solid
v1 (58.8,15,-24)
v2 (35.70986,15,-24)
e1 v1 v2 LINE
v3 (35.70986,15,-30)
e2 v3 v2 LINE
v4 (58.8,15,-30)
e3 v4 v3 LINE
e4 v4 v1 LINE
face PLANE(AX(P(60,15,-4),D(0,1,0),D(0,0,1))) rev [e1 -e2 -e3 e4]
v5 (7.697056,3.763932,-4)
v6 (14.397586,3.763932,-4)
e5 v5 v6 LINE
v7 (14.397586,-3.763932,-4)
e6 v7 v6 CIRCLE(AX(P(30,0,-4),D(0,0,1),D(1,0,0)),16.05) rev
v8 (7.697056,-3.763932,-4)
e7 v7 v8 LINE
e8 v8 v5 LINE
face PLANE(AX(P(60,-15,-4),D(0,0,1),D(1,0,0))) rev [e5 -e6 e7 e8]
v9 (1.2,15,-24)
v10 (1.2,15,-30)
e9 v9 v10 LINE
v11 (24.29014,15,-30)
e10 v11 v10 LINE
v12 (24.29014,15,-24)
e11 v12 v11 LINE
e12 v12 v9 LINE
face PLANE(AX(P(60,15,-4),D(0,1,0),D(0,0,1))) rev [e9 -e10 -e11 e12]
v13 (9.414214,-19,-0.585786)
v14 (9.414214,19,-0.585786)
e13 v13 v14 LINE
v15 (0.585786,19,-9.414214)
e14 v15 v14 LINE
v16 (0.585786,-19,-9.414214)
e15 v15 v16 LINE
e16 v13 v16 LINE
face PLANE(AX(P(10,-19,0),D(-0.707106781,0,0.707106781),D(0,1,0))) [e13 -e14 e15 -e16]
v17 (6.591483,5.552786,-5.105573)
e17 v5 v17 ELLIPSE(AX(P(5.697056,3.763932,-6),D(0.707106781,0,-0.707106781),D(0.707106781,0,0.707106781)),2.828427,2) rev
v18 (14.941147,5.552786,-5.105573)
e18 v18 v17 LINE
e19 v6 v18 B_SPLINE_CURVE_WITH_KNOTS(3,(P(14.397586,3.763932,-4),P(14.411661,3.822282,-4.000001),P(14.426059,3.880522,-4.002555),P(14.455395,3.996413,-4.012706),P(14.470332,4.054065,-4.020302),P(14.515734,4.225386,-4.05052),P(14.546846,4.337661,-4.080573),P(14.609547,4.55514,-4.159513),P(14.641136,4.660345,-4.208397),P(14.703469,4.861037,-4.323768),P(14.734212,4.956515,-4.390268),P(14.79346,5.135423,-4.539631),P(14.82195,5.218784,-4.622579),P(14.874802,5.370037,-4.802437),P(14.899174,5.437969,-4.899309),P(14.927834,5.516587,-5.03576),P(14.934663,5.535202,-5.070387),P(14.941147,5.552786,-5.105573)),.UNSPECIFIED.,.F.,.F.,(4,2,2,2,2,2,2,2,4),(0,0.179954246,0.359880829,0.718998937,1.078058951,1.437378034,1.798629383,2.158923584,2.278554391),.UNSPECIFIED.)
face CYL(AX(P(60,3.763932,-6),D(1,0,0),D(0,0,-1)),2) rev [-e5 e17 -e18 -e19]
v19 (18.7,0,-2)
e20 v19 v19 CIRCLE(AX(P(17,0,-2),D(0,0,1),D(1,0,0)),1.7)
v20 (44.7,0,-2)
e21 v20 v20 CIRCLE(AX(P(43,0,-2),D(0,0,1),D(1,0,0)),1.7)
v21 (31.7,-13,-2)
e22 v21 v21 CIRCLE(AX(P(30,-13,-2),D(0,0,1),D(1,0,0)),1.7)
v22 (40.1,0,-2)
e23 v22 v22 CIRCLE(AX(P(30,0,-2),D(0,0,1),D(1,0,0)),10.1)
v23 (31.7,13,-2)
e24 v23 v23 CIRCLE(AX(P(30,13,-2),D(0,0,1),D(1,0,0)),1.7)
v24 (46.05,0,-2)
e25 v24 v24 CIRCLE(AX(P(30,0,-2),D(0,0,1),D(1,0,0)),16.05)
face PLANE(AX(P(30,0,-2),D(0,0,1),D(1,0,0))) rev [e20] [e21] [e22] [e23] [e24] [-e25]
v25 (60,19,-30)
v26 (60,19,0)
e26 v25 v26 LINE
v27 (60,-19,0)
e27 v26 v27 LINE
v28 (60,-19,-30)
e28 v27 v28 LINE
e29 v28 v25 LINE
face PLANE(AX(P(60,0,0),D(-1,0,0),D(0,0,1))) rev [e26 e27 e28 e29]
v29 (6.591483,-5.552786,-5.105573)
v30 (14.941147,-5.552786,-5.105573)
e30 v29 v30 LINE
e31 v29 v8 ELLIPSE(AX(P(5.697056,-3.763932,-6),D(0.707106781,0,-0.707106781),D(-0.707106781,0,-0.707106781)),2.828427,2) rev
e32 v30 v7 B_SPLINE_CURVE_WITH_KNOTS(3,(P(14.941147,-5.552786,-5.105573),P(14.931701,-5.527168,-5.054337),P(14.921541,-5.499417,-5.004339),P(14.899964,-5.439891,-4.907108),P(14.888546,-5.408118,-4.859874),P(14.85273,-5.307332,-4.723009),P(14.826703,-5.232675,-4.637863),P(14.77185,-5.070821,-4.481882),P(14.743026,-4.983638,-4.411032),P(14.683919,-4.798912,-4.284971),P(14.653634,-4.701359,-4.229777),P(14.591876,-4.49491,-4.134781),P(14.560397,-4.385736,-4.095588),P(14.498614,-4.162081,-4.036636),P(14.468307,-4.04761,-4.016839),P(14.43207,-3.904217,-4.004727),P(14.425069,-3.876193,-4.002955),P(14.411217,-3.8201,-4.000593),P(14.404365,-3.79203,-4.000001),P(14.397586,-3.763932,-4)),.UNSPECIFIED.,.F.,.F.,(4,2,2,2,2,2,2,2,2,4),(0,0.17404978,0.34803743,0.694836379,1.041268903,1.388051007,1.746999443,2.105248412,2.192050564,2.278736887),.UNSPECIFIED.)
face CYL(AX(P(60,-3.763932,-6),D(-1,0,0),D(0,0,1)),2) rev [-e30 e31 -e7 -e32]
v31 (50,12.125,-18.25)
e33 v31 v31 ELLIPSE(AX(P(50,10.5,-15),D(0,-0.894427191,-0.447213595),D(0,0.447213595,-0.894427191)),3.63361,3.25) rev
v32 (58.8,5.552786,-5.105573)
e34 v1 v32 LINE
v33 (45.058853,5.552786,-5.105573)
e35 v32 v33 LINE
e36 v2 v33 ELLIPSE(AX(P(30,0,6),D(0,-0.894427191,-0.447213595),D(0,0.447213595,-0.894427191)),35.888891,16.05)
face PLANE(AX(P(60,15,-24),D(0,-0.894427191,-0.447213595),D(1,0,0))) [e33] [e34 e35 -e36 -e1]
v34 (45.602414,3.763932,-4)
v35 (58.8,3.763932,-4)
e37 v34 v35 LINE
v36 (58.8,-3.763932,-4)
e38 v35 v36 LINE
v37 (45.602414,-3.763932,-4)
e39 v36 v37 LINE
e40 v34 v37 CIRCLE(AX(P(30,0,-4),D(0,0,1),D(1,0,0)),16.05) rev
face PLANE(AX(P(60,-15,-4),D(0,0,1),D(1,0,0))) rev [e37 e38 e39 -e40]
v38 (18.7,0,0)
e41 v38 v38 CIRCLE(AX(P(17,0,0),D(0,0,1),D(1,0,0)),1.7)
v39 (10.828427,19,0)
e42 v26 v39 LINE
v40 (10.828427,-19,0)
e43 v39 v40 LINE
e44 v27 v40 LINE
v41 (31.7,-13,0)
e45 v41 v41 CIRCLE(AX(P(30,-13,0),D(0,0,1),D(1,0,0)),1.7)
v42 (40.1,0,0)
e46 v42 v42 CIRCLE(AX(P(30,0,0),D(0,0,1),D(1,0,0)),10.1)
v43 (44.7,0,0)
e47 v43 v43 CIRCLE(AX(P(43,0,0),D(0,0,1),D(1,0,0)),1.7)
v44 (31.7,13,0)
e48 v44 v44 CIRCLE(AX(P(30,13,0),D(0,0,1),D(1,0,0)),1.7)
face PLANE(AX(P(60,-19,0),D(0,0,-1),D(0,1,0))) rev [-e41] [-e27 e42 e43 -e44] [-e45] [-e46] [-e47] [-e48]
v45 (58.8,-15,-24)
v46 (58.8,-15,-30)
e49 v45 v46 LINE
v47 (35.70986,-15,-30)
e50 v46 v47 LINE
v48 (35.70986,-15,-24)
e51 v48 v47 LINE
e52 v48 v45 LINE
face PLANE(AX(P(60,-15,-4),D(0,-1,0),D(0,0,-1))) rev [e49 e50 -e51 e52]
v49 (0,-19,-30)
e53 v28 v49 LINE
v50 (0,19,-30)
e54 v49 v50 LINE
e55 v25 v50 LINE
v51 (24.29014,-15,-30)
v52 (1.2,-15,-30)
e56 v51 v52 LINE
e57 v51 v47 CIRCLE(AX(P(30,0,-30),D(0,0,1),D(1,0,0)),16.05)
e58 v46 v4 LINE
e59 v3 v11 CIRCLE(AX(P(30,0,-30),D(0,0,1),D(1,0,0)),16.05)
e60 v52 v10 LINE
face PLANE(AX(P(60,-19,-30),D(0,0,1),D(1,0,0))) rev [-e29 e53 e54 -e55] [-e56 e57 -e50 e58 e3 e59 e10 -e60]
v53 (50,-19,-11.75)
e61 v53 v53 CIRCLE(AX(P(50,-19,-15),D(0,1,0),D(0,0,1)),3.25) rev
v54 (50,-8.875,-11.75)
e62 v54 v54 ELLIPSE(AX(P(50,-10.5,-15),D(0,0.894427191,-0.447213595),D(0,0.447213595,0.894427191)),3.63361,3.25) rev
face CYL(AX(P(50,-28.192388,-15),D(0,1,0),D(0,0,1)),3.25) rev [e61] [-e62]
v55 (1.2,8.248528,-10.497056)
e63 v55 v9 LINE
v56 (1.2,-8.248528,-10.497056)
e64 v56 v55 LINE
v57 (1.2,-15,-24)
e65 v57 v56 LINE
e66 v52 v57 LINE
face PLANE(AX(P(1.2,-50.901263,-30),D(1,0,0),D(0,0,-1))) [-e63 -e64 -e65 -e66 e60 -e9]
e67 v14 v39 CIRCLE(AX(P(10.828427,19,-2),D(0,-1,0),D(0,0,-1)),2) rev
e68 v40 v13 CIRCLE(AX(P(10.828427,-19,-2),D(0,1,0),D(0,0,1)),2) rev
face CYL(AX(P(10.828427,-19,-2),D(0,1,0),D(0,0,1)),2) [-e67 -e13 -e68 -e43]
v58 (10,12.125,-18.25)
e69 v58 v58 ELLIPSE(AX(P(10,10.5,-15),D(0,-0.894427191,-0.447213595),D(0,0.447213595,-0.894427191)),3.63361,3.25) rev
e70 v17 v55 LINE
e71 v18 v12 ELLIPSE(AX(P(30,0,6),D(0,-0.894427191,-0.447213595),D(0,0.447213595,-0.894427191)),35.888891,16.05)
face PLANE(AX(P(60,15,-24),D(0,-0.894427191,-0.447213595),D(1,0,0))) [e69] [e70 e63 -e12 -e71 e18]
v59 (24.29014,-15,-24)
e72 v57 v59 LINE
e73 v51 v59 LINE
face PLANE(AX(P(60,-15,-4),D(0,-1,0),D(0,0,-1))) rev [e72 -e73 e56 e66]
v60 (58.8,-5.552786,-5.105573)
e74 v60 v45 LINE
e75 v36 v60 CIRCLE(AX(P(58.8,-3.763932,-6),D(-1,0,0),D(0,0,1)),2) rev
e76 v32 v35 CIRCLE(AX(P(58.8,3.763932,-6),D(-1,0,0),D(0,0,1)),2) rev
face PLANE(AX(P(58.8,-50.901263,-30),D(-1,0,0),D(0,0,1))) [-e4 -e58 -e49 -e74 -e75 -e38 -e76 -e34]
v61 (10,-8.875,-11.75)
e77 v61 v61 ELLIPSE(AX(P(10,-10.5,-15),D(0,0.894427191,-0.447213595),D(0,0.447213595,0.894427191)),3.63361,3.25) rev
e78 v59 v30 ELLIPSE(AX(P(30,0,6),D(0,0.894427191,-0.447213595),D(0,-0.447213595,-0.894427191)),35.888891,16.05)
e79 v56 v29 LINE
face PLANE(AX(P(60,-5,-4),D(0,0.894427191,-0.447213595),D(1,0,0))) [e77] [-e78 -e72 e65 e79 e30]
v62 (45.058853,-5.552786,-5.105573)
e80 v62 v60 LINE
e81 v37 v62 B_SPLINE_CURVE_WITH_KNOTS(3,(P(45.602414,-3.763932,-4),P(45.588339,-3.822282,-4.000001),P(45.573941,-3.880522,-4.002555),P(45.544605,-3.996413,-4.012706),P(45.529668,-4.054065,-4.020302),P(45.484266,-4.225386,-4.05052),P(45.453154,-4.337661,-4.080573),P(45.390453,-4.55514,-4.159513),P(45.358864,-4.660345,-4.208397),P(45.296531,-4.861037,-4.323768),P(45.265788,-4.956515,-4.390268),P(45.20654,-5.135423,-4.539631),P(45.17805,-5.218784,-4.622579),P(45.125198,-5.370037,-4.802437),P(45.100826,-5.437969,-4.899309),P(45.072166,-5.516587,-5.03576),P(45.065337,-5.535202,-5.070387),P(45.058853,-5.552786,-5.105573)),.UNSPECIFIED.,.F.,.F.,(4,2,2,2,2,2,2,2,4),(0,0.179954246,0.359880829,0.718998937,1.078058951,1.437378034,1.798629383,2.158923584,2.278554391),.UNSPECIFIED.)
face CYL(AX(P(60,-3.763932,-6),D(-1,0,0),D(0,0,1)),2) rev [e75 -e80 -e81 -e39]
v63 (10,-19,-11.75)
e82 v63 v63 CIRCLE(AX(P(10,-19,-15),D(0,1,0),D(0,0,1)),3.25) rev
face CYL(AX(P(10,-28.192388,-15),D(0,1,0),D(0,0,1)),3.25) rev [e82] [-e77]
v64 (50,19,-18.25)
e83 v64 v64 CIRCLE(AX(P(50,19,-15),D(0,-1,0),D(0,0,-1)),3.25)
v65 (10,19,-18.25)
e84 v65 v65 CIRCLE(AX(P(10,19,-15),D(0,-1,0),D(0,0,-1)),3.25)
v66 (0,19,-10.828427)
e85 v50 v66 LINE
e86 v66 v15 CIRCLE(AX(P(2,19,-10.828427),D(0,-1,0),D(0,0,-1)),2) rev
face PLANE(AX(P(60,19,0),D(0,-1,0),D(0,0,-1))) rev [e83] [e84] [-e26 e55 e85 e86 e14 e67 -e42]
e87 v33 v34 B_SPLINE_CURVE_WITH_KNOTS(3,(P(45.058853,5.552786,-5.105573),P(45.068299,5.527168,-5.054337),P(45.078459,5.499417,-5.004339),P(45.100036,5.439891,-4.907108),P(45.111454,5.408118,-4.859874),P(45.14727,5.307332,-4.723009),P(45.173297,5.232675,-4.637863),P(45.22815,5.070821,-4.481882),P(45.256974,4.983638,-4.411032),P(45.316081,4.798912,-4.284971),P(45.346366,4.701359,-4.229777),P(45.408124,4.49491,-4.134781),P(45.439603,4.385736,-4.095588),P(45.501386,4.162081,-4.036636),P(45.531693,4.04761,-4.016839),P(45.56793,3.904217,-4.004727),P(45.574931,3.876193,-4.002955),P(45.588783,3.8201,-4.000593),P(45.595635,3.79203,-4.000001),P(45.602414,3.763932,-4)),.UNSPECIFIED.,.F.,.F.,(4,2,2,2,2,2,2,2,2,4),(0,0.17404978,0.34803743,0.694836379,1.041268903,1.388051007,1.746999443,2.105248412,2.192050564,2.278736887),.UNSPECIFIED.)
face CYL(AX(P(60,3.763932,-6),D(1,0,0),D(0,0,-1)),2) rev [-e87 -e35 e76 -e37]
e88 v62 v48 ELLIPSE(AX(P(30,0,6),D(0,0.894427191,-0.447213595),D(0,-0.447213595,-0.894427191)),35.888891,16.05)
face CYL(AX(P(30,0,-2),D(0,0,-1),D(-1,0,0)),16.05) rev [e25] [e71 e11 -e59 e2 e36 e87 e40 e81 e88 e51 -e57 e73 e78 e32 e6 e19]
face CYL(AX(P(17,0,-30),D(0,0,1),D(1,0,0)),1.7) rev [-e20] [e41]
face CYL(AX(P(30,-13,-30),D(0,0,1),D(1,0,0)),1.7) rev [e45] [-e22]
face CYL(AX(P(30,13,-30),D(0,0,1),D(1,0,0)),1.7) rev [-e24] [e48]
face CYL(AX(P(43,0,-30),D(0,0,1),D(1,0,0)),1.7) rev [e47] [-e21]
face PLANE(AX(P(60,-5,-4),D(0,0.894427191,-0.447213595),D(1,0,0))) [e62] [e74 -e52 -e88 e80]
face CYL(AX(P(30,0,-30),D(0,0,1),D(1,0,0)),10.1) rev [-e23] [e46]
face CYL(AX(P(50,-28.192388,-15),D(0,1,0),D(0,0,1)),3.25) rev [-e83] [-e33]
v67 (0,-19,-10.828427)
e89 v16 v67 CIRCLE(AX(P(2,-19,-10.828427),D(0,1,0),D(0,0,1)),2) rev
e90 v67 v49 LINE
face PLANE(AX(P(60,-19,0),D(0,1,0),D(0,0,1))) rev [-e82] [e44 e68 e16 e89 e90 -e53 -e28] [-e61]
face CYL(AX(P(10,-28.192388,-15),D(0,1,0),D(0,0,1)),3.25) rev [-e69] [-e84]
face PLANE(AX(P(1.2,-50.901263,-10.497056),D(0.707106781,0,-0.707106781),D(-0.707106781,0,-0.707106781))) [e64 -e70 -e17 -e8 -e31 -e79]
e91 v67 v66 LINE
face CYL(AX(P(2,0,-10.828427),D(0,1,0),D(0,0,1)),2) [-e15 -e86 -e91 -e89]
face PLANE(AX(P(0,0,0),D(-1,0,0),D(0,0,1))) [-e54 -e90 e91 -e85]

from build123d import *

# Parameters (mm, degrees)
BOSS_EXTRU_1_DEPTH                  = 60
CHANFREIN2_SIZE                     = 10
CHANFREIN2_SIZE2                    = 20
CHANFREIN3_SIZE                     = 20
CHANFREIN3_SIZE2                    = 10
CONG_3_R                            = 2
ENL_V_MAT_EXTRU_4_DEPTH             = 2
ENL_V_MAT_EXTRU_4_DEPTH_BACK        = 66.720872054
ENL_V_MAT_EXTRU_4_START             = -4
ESQUISSE5_R                         = 16.05
ESQUISSE2_R                         = 1.7
ESQUISSE2_R_2                       = 10.1
ENL_V_MAT_EXTRU_1_DEPTH             = 70.720872183
ESQUISSE3_R                         = 1.6
ENL_V_MAT_EXTRU_2_DEPTH             = 78.097341186
ENL_V_MAT_EXTRU_5_REACH             = 71.721
ESQUISSE6_R                         = 3.25
ENL_V_MAT_EXTRU_5_DIRECTION_2_REACH = 71.721
CHANFREIN1_SIZE                     = 10
BOSS_EXTRU_3_REACH                  = 79.097
ESQUISSE8_W                         = 1.2
ESQUISSE8_H                         = 30
CONG_2_R                            = 2


with BuildPart() as part:
    # Esquisse1 → Boss.-Extru.1 (new body)
    with BuildSketch(Plane(origin=(0, 0, 0), x_dir=(0, 0, -1), z_dir=(1, 0, 0))):
        Polygon((0, -19), (0, 19), (30, 19), (30, 15), (4, 15), (4, -15), (30, -15), (30, -19), align=None)
    extrude(amount=BOSS_EXTRU_1_DEPTH)

    # Chanfrein2
    chanfrein2_edges = [part.edges().sort_by_distance(p)[0] for p in [
        (30, 15, -4),
    ]]
    chanfrein2_side = [part.faces().sort_by_distance(p)[0] for p in [
        (30, 0, -4),
    ]]
    chamfer(chanfrein2_edges, length=CHANFREIN2_SIZE, length2=CHANFREIN2_SIZE2, reference=chanfrein2_side[0])

    # Chanfrein3
    chanfrein3_edges = [part.edges().sort_by_distance(p)[0] for p in [
        (30, -15, -4),
    ]]
    chanfrein3_side = [part.faces().sort_by_distance(p)[0] for p in [
        (30, -15, -17),
    ]]
    chamfer(chanfrein3_edges, length=CHANFREIN3_SIZE, length2=CHANFREIN3_SIZE2, reference=chanfrein3_side[0])

    # Congé3
    cong_3_edges = [part.edges().sort_by_distance(p)[0] for p in [
        (30, 5, -4),
        (30, -5, -4),
    ]]
    fillet(cong_3_edges, radius=CONG_3_R)

    # Esquisse5 → Enlèv. mat.-Extru.4 (cut, two sides: drawn at the far end of the back side and taken through both)
    with BuildSketch(Plane.XY.offset(ENL_V_MAT_EXTRU_4_START - ENL_V_MAT_EXTRU_4_DEPTH_BACK)):
        with Locations(Location((30, 0, 0), (0, 0, 193.562911562))):
            Circle(ESQUISSE5_R)
    extrude(amount=ENL_V_MAT_EXTRU_4_DEPTH + ENL_V_MAT_EXTRU_4_DEPTH_BACK, mode=Mode.SUBTRACT)

    # Esquisse2 → Enlèv. mat.-Extru.1 (cut, through all)
    with BuildSketch(Plane.XY):
        with Locations((30, 13)):
            Circle(ESQUISSE2_R)
        with Locations((43, 0)):
            Circle(ESQUISSE2_R)
        with Locations((30, -13)):
            Circle(ESQUISSE2_R)
        with Locations((17, 0)):
            Circle(ESQUISSE2_R)
        with Locations((30, 0)):
            Circle(ESQUISSE2_R_2)
    extrude(amount=-ENL_V_MAT_EXTRU_1_DEPTH, mode=Mode.SUBTRACT)

    # Esquisse3 → Enlèv. mat.-Extru.2 (cut, through all)
    with BuildSketch(Plane.XZ.offset(19)):
        with Locations(Location((10, -15, 0), (0, 0, 270))):
            Circle(ESQUISSE3_R)
        with Locations(Location((50, -15, 0), (0, 0, 270))):
            Circle(ESQUISSE3_R)
    extrude(amount=-ENL_V_MAT_EXTRU_2_DEPTH, mode=Mode.SUBTRACT)

    # Enlèv. mat.-Extru.5: up to this face of the body (flat: up to its plane)
    enl_v_mat_extru_5_end = Plane(part.part.faces().sort_by_distance((30, -19, -15))[0])
    # Esquisse6 → Enlèv. mat.-Extru.5 (cut, up to the picked face)
    with BuildSketch(Plane(origin=(0, 0, 0), x_dir=(1, 0, 0), z_dir=(0, 1, 0)), mode=Mode.PRIVATE) as enl_v_mat_extru_5_sk1:
        with Locations(Location((10, 15, 0), (0, 0, 90))):
            Circle(ESQUISSE6_R)
    enl_v_mat_extru_5_tool1 = split(extrude(enl_v_mat_extru_5_sk1.sketch, amount=-ENL_V_MAT_EXTRU_5_REACH, mode=Mode.PRIVATE), bisect_by=enl_v_mat_extru_5_end, keep=Keep.BOTH, mode=Mode.PRIVATE)
    # Esquisse6 → Enlèv. mat.-Extru.5 (cut, up to the picked face)
    with BuildSketch(Plane(origin=(0, 0, 0), x_dir=(1, 0, 0), z_dir=(0, 1, 0)), mode=Mode.PRIVATE) as enl_v_mat_extru_5_sk2:
        with Locations(Location((50, 15, 0), (0, 0, 270))):
            Circle(ESQUISSE6_R)
    enl_v_mat_extru_5_tool2 = split(extrude(enl_v_mat_extru_5_sk2.sketch, amount=-ENL_V_MAT_EXTRU_5_REACH, mode=Mode.PRIVATE), bisect_by=enl_v_mat_extru_5_end, keep=Keep.BOTH, mode=Mode.PRIVATE)
    add(enl_v_mat_extru_5_tool1.solids().sort_by(Axis((10, 0, -15), (0, -1, 0)))[0], mode=Mode.SUBTRACT)
    add(enl_v_mat_extru_5_tool2.solids().sort_by(Axis((50, 0, -15), (0, -1, 0)))[0], mode=Mode.SUBTRACT)

    # Enlèv. mat.-Extru.5 direction 2: up to this face of the body (flat: up to its plane)
    enl_v_mat_extru_5_direction_2_end = Plane(part.part.faces().sort_by_distance((30, 19, -15))[0])
    # Esquisse6 → Enlèv. mat.-Extru.5 direction 2 (cut, up to the picked face)
    with BuildSketch(Plane(origin=(0, 0, 0), x_dir=(1, 0, 0), z_dir=(0, 1, 0)), mode=Mode.PRIVATE) as enl_v_mat_extru_5_direction_2_sk1:
        with Locations(Location((10, 15, 0), (0, 0, 90))):
            Circle(ESQUISSE6_R)
    enl_v_mat_extru_5_direction_2_tool1 = split(extrude(enl_v_mat_extru_5_direction_2_sk1.sketch, amount=ENL_V_MAT_EXTRU_5_DIRECTION_2_REACH, mode=Mode.PRIVATE), bisect_by=enl_v_mat_extru_5_direction_2_end, keep=Keep.BOTH, mode=Mode.PRIVATE)
    # Esquisse6 → Enlèv. mat.-Extru.5 direction 2 (cut, up to the picked face)
    with BuildSketch(Plane(origin=(0, 0, 0), x_dir=(1, 0, 0), z_dir=(0, 1, 0)), mode=Mode.PRIVATE) as enl_v_mat_extru_5_direction_2_sk2:
        with Locations(Location((50, 15, 0), (0, 0, 270))):
            Circle(ESQUISSE6_R)
    enl_v_mat_extru_5_direction_2_tool2 = split(extrude(enl_v_mat_extru_5_direction_2_sk2.sketch, amount=ENL_V_MAT_EXTRU_5_DIRECTION_2_REACH, mode=Mode.PRIVATE), bisect_by=enl_v_mat_extru_5_direction_2_end, keep=Keep.BOTH, mode=Mode.PRIVATE)
    add(enl_v_mat_extru_5_direction_2_tool1.solids().sort_by(Axis((10, 0, -15), (0, 1, 0)))[0], mode=Mode.SUBTRACT)
    add(enl_v_mat_extru_5_direction_2_tool2.solids().sort_by(Axis((50, 0, -15), (0, 1, 0)))[0], mode=Mode.SUBTRACT)

    # Chanfrein1
    # the kernel refuses this chamfer: 10 mm, written as the material it takes off along each edge
    with BuildSketch(Plane(origin=(0, -44.71682988, 0), x_dir=(-0.027495876610586372, 0, -0.9996219169112968), z_dir=(0, 1, 0))) as chanfrein1_piece_1:
        Polygon((CHANFREIN1_SIZE * 0.999621916911, -CHANFREIN1_SIZE * 0.0274958766106), (-CHANFREIN1_SIZE * 0.0274958766106, -CHANFREIN1_SIZE * 0.999621916911), (0, 0), align=None)
    extrude(amount=89.433659759, mode=Mode.SUBTRACT)

    # Boss.-Extru.3: up to this face of the body (flat: up to its plane)
    boss_extru_3_end = Plane(part.part.faces().sort_by_distance((30.791937825, -19, -15.346472798))[0])
    # Esquisse8 → Boss.-Extru.3 (add, up to the picked face)
    with BuildSketch(Plane(origin=(0, 19, 0), x_dir=(1, 0, 0), z_dir=(0, 1, 0)), mode=Mode.PRIVATE) as boss_extru_3_sk1:
        with Locations((59.4, 15)):
            Rectangle(ESQUISSE8_W, ESQUISSE8_H)
    boss_extru_3_tool1 = split(extrude(boss_extru_3_sk1.sketch, amount=-BOSS_EXTRU_3_REACH, mode=Mode.PRIVATE), bisect_by=boss_extru_3_end, keep=Keep.BOTH, mode=Mode.PRIVATE)
    # Esquisse8 → Boss.-Extru.3 (add, up to the picked face)
    with BuildSketch(Plane(origin=(0, 19, 0), x_dir=(1, 0, 0), z_dir=(0, 1, 0)), mode=Mode.PRIVATE) as boss_extru_3_sk2:
        Polygon((1.2, 30), (1.2, 10.497056275), (10.848528137, 0.848528137), (10, 0), (0, 10), (0, 30), align=None)
    boss_extru_3_tool2 = split(extrude(boss_extru_3_sk2.sketch, amount=-BOSS_EXTRU_3_REACH, mode=Mode.PRIVATE), bisect_by=boss_extru_3_end, keep=Keep.BOTH, mode=Mode.PRIVATE)
    add(boss_extru_3_tool1.solids().sort_by(Axis((59.4, 19, -15), (0, -1, 0)))[0])
    add(boss_extru_3_tool2.solids().sort_by(Axis((0.880987, 19, -20.248528), (0, -1, 0)))[0])

    # Congé2
    cong_2_edges = [part.edges().sort_by_distance(p)[0] for p in [
        (10, 0, 0),
        (0, 0, -10),
    ]]
    fillet(cong_2_edges, radius=CONG_2_R)


solid = part.part
